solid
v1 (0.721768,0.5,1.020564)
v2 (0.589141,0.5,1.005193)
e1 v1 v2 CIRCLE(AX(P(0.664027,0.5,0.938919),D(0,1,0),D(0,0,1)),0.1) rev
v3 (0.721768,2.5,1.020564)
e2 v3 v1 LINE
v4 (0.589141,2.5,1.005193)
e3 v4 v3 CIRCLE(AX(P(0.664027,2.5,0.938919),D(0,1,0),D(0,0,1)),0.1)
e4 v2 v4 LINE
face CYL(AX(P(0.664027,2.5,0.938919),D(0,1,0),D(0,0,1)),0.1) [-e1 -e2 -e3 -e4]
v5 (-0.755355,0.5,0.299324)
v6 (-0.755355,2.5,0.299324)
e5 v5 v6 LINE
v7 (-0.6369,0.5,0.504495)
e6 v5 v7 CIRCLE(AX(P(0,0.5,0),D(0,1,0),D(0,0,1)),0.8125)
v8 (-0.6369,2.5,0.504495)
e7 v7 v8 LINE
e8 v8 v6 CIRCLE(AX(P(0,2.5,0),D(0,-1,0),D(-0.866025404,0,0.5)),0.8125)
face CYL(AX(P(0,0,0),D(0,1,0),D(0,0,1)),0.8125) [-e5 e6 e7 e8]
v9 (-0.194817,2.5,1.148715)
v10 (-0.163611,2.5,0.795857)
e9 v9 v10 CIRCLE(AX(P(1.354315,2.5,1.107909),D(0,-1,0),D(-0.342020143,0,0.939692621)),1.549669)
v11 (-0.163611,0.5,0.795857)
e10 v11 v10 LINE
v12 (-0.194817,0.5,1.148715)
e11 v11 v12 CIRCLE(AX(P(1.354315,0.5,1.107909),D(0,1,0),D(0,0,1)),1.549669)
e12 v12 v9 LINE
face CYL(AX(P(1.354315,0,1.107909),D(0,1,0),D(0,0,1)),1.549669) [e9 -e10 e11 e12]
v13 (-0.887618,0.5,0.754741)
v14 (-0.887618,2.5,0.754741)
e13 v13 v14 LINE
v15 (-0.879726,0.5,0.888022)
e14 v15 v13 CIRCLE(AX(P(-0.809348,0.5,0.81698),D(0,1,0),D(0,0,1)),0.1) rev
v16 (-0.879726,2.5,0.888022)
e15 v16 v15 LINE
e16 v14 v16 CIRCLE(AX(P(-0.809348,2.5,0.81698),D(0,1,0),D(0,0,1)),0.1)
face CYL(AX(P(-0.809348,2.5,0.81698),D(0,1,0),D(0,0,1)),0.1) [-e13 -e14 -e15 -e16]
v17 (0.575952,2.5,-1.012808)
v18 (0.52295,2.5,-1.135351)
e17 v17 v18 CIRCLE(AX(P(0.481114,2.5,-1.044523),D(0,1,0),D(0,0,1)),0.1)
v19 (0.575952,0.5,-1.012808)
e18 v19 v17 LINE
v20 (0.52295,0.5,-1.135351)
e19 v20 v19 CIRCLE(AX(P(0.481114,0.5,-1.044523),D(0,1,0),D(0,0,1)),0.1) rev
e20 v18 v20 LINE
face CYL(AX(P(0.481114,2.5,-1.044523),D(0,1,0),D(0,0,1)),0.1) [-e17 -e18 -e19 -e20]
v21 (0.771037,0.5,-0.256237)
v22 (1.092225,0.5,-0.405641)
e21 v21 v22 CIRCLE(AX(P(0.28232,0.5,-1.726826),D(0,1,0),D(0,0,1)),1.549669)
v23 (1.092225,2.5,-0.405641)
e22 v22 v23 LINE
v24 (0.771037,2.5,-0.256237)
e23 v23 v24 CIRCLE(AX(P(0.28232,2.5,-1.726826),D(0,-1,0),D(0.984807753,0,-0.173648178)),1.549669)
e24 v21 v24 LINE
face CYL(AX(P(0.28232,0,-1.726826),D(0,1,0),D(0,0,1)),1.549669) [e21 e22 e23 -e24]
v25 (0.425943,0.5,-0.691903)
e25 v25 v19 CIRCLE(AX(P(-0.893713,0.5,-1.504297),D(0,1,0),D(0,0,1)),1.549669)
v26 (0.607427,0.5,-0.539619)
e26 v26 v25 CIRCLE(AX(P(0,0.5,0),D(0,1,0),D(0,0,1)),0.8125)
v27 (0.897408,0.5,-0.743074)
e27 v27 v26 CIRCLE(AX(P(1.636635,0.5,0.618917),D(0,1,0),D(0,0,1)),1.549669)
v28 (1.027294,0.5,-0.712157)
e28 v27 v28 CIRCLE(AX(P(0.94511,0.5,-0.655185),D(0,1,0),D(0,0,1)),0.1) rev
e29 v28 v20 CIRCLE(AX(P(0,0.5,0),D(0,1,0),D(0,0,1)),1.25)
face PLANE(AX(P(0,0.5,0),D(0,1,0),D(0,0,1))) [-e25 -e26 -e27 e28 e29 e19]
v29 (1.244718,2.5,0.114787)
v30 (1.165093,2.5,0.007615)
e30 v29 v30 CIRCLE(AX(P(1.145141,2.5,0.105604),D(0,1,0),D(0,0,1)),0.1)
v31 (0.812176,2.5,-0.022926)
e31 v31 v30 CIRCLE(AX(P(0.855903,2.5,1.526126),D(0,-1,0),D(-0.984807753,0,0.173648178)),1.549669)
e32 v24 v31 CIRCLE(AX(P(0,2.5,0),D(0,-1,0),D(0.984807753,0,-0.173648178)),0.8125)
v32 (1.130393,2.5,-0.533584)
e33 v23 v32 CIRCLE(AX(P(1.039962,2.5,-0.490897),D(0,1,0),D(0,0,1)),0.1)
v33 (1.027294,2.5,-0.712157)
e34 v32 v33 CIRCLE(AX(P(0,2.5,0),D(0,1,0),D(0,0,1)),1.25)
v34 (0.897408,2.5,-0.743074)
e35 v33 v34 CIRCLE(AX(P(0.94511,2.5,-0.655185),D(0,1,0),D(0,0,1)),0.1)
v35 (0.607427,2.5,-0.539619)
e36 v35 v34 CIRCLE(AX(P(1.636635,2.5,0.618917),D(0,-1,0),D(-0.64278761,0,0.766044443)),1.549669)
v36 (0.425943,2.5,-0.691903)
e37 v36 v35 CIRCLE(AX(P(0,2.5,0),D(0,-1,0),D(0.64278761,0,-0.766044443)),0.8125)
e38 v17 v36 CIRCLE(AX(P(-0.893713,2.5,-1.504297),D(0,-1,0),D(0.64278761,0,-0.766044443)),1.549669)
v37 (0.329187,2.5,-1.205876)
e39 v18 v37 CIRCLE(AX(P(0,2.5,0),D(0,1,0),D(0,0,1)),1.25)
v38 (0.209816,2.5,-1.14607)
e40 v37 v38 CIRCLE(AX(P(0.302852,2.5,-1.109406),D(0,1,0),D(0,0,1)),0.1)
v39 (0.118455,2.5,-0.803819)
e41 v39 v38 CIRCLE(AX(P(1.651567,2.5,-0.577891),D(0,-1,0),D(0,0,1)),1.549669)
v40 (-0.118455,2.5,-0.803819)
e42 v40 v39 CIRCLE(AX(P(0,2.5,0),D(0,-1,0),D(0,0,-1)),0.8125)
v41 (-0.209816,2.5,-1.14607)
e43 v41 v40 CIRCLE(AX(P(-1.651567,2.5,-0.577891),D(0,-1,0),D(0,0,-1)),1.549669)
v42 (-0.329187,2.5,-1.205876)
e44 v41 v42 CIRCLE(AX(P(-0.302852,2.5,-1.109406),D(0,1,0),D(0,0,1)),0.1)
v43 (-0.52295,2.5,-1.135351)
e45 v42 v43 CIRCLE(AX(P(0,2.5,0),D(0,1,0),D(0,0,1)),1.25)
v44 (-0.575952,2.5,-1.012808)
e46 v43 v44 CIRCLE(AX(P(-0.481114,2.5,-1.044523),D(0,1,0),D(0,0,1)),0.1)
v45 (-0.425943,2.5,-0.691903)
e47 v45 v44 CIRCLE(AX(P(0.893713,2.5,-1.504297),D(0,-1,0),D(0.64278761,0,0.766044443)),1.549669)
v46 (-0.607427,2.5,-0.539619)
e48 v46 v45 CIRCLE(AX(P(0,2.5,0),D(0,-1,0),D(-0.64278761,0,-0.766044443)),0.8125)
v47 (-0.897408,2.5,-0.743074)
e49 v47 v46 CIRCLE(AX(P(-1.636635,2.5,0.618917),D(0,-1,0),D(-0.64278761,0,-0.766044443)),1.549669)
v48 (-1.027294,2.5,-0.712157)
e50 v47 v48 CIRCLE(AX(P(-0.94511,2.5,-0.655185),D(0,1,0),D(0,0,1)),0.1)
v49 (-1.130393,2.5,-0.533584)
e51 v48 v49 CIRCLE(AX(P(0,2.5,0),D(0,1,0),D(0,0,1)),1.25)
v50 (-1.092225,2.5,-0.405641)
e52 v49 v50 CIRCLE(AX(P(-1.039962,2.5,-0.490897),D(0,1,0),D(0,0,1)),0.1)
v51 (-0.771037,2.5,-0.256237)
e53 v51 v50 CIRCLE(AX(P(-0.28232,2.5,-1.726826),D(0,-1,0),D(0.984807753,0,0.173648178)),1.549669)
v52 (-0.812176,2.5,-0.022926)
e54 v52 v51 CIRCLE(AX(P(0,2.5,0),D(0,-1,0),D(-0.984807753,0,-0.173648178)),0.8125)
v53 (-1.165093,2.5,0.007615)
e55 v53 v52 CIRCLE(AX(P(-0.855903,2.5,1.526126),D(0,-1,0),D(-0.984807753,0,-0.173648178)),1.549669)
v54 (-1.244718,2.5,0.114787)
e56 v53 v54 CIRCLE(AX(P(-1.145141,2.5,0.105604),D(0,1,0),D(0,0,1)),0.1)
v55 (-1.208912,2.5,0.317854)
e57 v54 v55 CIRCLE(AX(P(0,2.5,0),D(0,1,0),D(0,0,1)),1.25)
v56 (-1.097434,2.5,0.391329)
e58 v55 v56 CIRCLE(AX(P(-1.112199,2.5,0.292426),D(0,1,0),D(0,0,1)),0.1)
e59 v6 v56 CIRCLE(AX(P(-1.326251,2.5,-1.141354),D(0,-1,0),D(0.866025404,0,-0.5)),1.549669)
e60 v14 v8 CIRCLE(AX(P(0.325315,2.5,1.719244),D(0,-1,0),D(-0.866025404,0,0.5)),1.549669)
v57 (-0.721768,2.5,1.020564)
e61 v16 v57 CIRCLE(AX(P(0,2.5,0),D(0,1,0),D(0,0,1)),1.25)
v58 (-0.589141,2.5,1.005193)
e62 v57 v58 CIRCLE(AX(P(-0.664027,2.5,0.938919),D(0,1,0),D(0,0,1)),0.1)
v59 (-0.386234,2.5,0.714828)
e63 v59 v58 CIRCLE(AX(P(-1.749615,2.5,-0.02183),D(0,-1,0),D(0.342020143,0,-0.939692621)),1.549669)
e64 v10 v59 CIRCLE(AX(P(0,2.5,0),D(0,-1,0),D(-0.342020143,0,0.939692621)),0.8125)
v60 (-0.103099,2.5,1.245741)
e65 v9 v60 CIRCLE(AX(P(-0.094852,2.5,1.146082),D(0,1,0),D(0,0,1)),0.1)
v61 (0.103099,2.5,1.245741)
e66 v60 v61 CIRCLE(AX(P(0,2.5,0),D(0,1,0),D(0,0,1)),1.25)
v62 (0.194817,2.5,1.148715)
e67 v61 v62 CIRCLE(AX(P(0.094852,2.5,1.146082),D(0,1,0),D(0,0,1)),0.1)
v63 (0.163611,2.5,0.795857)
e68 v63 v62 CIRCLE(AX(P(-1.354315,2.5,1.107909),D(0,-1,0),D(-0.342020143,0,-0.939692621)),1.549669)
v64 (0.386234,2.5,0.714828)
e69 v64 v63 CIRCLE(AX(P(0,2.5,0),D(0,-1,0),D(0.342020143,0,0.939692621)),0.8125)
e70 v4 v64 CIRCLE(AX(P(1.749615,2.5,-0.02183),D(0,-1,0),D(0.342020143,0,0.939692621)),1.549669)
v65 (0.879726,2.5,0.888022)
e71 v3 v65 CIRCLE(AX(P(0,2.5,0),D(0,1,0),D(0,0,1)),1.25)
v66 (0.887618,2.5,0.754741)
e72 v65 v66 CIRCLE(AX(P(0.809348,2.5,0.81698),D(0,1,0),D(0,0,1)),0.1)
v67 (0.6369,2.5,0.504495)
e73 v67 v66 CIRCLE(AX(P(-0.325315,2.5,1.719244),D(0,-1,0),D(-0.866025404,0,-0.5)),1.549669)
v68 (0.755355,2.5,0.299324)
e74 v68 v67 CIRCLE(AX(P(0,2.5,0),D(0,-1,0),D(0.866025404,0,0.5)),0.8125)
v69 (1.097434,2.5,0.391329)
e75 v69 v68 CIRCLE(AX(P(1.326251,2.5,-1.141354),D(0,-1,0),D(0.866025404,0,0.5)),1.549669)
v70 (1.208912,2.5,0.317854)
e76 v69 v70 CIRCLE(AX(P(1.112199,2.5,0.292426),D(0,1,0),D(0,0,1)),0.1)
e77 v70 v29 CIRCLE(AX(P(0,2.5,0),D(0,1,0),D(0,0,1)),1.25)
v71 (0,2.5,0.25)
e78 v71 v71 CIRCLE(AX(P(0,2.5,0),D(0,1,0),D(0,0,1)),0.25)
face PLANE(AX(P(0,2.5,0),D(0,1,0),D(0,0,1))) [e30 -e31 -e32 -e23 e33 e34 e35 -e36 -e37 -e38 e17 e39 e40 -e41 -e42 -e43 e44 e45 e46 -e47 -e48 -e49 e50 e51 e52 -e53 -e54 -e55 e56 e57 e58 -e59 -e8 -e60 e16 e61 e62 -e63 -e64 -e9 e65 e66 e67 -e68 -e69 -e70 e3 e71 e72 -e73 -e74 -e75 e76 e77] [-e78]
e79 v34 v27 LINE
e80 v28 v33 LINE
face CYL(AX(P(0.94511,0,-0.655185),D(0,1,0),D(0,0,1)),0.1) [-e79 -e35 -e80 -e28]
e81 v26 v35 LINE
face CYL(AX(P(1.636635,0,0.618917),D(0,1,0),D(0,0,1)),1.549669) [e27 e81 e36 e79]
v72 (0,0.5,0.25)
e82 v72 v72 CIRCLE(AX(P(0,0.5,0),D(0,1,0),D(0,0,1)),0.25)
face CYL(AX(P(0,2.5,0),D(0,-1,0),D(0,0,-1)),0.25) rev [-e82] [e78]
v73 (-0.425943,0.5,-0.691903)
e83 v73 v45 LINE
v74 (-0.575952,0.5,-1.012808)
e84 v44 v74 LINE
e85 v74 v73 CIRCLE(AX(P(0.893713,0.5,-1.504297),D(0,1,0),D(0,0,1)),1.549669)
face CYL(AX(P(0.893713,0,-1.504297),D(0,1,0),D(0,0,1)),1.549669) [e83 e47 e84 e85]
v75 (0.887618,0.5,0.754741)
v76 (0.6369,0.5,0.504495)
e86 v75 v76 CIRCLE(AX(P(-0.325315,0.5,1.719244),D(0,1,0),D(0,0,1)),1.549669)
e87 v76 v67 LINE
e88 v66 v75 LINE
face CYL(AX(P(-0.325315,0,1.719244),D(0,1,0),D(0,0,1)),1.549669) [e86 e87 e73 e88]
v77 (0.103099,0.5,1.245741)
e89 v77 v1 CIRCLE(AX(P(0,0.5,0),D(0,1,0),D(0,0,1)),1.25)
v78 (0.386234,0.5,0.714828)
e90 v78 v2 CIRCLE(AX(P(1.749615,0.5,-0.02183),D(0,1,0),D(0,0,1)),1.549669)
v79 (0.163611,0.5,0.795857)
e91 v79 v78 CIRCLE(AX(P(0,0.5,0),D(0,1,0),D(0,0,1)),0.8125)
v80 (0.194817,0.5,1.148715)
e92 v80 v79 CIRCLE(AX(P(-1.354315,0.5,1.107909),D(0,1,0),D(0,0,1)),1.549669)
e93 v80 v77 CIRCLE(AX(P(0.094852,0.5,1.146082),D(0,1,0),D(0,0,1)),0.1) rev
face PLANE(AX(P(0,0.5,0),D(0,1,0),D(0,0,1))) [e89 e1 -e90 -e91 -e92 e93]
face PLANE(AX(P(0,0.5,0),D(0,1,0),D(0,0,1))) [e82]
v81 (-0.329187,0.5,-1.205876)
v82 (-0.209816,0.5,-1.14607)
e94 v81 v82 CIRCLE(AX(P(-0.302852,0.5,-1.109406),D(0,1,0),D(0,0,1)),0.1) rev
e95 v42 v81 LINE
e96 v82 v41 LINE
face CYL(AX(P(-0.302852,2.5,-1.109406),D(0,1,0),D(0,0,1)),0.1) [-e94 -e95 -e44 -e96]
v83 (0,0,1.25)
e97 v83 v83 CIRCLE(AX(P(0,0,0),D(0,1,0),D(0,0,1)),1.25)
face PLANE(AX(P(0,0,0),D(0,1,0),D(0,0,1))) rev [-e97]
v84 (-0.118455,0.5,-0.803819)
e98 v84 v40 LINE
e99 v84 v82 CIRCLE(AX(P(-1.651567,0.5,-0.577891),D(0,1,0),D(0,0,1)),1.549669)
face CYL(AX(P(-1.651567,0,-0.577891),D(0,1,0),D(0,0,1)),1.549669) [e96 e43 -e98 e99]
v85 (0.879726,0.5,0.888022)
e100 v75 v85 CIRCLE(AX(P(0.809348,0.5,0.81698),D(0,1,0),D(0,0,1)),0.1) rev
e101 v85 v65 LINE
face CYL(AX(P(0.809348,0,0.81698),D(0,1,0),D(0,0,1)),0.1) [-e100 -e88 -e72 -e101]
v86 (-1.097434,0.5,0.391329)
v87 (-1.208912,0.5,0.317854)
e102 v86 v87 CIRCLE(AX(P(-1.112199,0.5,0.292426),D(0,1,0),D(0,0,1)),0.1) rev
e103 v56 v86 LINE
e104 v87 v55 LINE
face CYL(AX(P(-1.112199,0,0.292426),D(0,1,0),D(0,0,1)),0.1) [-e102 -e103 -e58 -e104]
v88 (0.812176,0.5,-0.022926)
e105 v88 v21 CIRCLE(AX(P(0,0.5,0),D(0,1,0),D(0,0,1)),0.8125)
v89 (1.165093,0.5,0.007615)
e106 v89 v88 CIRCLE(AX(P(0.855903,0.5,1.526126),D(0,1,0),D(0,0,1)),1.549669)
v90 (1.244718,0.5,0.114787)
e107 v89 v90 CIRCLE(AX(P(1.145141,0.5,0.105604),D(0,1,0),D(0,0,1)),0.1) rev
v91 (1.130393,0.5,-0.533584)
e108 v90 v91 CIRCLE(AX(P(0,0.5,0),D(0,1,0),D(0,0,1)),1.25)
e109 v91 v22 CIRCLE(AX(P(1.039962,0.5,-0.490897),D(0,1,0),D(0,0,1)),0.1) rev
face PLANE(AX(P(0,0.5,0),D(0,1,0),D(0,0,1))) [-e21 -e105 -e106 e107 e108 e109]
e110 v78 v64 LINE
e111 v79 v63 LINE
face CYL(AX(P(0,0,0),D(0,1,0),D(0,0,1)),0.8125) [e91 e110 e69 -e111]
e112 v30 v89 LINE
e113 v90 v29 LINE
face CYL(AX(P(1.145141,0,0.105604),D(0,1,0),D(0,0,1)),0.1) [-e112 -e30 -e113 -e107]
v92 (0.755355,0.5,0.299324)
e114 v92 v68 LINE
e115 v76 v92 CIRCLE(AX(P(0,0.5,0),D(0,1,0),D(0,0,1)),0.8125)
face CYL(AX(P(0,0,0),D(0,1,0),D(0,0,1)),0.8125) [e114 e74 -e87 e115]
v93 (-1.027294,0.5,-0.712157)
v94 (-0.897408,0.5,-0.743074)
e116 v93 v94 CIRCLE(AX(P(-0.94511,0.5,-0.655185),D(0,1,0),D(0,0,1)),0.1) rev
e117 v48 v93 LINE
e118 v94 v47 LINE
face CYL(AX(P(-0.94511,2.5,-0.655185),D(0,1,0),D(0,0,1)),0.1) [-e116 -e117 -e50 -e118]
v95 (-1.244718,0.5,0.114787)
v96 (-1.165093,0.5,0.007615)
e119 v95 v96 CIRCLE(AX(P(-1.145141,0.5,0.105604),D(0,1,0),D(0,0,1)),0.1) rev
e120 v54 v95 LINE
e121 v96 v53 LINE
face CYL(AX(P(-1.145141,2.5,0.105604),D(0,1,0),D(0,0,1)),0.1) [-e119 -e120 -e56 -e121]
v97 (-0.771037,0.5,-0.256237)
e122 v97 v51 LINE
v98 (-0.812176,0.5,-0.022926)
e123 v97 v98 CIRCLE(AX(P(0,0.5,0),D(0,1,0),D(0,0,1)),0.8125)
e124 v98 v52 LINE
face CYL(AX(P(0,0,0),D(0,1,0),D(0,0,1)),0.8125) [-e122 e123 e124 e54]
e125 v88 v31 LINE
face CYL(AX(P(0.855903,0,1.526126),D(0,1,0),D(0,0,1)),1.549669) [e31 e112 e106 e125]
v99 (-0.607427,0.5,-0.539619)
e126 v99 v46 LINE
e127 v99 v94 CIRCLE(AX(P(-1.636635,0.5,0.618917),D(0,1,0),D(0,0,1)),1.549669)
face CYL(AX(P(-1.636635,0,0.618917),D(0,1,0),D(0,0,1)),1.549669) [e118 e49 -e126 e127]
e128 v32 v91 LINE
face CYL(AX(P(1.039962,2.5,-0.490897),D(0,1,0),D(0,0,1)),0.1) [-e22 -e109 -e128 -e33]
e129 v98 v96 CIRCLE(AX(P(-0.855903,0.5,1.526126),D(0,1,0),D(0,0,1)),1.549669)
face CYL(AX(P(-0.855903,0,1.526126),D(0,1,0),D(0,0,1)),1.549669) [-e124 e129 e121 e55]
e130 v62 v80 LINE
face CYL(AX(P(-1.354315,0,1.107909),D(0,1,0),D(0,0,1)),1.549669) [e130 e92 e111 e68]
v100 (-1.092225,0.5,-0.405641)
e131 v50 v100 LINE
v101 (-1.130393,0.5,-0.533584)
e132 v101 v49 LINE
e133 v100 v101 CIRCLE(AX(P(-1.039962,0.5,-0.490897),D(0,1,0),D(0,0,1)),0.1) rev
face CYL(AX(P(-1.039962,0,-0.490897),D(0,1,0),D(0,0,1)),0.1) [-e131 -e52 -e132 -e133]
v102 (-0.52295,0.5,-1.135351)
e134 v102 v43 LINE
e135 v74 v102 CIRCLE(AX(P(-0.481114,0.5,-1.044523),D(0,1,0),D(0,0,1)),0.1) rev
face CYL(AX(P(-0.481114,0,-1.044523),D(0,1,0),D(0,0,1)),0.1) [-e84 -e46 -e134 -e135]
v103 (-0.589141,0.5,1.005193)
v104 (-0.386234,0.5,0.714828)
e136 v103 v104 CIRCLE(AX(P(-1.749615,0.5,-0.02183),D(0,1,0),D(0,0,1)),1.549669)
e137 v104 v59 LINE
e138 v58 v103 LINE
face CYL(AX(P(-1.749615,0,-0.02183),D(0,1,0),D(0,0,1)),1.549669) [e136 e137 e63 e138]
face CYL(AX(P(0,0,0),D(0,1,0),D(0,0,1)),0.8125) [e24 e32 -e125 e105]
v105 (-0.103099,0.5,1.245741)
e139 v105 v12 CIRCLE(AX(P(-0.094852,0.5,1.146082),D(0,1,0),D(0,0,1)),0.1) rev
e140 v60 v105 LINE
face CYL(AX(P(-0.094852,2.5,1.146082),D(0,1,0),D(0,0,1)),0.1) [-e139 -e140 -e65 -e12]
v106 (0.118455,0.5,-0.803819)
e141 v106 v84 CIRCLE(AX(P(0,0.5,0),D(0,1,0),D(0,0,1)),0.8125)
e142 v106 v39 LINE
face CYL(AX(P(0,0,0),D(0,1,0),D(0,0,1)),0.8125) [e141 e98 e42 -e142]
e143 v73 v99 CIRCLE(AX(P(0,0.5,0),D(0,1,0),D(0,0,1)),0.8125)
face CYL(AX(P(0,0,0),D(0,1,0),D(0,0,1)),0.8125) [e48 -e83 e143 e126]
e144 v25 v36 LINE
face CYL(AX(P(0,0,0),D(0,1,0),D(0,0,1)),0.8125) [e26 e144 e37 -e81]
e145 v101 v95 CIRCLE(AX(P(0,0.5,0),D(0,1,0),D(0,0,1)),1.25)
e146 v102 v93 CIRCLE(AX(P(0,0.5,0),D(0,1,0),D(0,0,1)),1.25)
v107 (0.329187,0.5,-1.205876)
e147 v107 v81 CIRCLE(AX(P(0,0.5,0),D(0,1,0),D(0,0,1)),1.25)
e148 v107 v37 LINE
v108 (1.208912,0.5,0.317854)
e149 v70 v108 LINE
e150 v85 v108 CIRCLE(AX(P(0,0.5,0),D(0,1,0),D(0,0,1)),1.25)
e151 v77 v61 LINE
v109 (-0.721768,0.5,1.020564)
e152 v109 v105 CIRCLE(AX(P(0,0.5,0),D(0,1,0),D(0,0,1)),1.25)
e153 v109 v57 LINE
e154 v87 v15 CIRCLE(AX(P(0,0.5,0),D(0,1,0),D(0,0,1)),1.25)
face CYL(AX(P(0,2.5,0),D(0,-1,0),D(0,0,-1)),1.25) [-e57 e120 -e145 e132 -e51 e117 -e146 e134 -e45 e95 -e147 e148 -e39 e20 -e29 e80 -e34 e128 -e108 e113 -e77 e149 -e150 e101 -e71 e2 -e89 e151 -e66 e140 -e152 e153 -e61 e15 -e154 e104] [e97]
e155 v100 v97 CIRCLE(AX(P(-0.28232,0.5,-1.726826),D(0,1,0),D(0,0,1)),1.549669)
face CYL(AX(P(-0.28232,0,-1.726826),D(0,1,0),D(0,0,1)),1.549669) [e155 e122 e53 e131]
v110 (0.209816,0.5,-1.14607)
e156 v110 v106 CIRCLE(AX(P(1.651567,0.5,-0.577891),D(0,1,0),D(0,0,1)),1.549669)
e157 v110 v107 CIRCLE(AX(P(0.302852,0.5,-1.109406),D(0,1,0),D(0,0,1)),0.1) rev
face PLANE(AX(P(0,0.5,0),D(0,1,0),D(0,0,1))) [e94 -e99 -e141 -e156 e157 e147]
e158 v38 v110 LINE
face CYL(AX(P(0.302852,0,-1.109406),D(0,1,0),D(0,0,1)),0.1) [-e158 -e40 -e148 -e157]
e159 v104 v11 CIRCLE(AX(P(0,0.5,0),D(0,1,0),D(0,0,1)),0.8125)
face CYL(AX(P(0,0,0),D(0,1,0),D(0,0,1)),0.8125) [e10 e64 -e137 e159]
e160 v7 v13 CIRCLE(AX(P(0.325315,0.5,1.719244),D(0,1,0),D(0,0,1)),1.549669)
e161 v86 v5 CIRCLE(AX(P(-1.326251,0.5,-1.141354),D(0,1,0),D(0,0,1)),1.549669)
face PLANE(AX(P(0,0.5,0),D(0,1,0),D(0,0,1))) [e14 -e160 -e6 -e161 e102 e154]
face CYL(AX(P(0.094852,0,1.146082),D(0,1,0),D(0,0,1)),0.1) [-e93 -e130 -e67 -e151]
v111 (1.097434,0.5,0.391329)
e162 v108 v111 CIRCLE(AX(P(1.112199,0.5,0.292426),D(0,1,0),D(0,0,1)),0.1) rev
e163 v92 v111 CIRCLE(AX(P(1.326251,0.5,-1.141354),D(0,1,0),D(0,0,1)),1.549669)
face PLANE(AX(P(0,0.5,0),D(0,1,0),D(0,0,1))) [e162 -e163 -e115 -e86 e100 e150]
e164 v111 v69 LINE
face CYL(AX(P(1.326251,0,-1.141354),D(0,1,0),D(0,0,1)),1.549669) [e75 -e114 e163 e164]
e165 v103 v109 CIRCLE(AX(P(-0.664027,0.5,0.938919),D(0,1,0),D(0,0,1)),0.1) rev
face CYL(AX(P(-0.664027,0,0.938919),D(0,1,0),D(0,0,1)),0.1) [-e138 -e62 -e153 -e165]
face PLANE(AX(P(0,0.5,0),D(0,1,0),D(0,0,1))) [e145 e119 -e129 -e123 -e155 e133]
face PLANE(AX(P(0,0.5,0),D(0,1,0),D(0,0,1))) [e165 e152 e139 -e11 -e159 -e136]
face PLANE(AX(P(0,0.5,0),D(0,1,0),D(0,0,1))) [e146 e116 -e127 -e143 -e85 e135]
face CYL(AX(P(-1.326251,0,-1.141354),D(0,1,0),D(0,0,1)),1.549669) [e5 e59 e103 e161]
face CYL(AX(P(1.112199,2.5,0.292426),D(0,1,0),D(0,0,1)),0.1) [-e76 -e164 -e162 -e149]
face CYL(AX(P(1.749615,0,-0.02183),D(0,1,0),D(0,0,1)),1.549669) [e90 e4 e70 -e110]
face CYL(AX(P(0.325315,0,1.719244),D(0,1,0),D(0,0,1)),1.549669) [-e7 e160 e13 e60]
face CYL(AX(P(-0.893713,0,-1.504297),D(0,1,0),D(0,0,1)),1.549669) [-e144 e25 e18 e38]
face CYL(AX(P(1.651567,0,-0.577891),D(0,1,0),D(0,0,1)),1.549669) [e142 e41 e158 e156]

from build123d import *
from build123d.topology import SkipClean

# Parameters (mm, degrees)
SKETCH1_R           = 1.25
SKETCH1_R_2         = 0.25
BOSS_EXTRUDE1_DEPTH = 2.5
CUT_EXTRUDE1_DEPTH  = 4.061862178
CIRPATTERN1_COUNT   = 9
FILLET1_R           = 0.1
SKETCH3_R           = 1.25
BOSS_EXTRUDE2_DEPTH = 0.5


with BuildPart() as part:
    # Sketch1 → Boss-Extrude1 (new body)
    with BuildSketch(Plane(origin=(0, 0, 0), x_dir=(1, 0, 0), z_dir=(0, 1, 0))):
        Circle(SKETCH1_R)
        Circle(SKETCH1_R_2, mode=Mode.SUBTRACT)
    extrude(amount=BOSS_EXTRUDE1_DEPTH)

    # Sketch2 → Cut-Extrude1 (cut, through all)
    with BuildSketch(Plane(origin=(0, 2.5, 0), x_dir=(1, 0, 0), z_dir=(0, 1, 0))):
        with BuildLine():
            ThreePointArc((-0.243920771, 1.225970088), (-0.166115152, 1.019374159), (-0.118455333, 0.803818751))
            ThreePointArc((-0.118455333, 0.803818751), (0, 0.8125), (0.118455333, 0.803818751))
            ThreePointArc((0.118455333, 0.803818751), (0.166115152, 1.019374159), (0.243920771, 1.225970088))
            ThreePointArc((0.243920771, 1.225970088), (0, 1.25), (-0.243920771, 1.225970088))
        make_face()
    cut_extrude1 = extrude(amount=-CUT_EXTRUDE1_DEPTH, mode=Mode.SUBTRACT)

    # CirPattern1: Cut-Extrude1 ×9 about axis
    cirpattern1_axis = Axis((0, 2.5, 0), (0, -1, 0))
    for i in range(1, CIRPATTERN1_COUNT):
        add(cut_extrude1.rotate(cirpattern1_axis, i * 360 / CIRPATTERN1_COUNT), mode=Mode.SUBTRACT)

    # Fillet1
    fillet1_edges = [part.edges().sort_by_distance(p)[0] for p in [
        (0.974892534, 1.25, -0.782358324),
        (0.243920771, 1.25, -1.225970088),
        (0.601184231, 1.25, -1.095936823),
        (1.164988451, 1.25, -0.453102538),
        (1.249701245, 1.25, 0.027327595),
        (0.939760855, 1.25, 0.824226628),
        (1.183681626, 1.25, 0.40174346),
        (0.190095917, 1.25, 1.235460862),
        (0.648517014, 1.25, 1.068609228),
        (-0.190095917, 1.25, 1.235460862),
        (-0.648517014, 1.25, 1.068609228),
        (-0.939760855, 1.25, 0.824226628),
        (-1.183681626, 1.25, 0.40174346),
        (-1.249701245, 1.25, 0.027327595),
        (-1.164988451, 1.25, -0.453102538),
        (-0.974892534, 1.25, -0.782358324),
        (-0.243920771, 1.25, -1.225970088),
        (-0.601184231, 1.25, -1.095936823),
    ]]
    fillet(fillet1_edges, radius=FILLET1_R)

    # Sketch3 → Boss-Extrude2 (add)
    with SkipClean():  # the faces are left unmerged after this step: merging them gives an invalid solid
        with BuildSketch(Plane(origin=(0, 0, 0), x_dir=(1, 0, 0), z_dir=(0, 1, 0))):
            Circle(SKETCH3_R)
        extrude(amount=BOSS_EXTRUDE2_DEPTH)
    add(part.part.scale(1), mode=Mode.REPLACE)  # the faces are merged on a copy


solid = part.part
